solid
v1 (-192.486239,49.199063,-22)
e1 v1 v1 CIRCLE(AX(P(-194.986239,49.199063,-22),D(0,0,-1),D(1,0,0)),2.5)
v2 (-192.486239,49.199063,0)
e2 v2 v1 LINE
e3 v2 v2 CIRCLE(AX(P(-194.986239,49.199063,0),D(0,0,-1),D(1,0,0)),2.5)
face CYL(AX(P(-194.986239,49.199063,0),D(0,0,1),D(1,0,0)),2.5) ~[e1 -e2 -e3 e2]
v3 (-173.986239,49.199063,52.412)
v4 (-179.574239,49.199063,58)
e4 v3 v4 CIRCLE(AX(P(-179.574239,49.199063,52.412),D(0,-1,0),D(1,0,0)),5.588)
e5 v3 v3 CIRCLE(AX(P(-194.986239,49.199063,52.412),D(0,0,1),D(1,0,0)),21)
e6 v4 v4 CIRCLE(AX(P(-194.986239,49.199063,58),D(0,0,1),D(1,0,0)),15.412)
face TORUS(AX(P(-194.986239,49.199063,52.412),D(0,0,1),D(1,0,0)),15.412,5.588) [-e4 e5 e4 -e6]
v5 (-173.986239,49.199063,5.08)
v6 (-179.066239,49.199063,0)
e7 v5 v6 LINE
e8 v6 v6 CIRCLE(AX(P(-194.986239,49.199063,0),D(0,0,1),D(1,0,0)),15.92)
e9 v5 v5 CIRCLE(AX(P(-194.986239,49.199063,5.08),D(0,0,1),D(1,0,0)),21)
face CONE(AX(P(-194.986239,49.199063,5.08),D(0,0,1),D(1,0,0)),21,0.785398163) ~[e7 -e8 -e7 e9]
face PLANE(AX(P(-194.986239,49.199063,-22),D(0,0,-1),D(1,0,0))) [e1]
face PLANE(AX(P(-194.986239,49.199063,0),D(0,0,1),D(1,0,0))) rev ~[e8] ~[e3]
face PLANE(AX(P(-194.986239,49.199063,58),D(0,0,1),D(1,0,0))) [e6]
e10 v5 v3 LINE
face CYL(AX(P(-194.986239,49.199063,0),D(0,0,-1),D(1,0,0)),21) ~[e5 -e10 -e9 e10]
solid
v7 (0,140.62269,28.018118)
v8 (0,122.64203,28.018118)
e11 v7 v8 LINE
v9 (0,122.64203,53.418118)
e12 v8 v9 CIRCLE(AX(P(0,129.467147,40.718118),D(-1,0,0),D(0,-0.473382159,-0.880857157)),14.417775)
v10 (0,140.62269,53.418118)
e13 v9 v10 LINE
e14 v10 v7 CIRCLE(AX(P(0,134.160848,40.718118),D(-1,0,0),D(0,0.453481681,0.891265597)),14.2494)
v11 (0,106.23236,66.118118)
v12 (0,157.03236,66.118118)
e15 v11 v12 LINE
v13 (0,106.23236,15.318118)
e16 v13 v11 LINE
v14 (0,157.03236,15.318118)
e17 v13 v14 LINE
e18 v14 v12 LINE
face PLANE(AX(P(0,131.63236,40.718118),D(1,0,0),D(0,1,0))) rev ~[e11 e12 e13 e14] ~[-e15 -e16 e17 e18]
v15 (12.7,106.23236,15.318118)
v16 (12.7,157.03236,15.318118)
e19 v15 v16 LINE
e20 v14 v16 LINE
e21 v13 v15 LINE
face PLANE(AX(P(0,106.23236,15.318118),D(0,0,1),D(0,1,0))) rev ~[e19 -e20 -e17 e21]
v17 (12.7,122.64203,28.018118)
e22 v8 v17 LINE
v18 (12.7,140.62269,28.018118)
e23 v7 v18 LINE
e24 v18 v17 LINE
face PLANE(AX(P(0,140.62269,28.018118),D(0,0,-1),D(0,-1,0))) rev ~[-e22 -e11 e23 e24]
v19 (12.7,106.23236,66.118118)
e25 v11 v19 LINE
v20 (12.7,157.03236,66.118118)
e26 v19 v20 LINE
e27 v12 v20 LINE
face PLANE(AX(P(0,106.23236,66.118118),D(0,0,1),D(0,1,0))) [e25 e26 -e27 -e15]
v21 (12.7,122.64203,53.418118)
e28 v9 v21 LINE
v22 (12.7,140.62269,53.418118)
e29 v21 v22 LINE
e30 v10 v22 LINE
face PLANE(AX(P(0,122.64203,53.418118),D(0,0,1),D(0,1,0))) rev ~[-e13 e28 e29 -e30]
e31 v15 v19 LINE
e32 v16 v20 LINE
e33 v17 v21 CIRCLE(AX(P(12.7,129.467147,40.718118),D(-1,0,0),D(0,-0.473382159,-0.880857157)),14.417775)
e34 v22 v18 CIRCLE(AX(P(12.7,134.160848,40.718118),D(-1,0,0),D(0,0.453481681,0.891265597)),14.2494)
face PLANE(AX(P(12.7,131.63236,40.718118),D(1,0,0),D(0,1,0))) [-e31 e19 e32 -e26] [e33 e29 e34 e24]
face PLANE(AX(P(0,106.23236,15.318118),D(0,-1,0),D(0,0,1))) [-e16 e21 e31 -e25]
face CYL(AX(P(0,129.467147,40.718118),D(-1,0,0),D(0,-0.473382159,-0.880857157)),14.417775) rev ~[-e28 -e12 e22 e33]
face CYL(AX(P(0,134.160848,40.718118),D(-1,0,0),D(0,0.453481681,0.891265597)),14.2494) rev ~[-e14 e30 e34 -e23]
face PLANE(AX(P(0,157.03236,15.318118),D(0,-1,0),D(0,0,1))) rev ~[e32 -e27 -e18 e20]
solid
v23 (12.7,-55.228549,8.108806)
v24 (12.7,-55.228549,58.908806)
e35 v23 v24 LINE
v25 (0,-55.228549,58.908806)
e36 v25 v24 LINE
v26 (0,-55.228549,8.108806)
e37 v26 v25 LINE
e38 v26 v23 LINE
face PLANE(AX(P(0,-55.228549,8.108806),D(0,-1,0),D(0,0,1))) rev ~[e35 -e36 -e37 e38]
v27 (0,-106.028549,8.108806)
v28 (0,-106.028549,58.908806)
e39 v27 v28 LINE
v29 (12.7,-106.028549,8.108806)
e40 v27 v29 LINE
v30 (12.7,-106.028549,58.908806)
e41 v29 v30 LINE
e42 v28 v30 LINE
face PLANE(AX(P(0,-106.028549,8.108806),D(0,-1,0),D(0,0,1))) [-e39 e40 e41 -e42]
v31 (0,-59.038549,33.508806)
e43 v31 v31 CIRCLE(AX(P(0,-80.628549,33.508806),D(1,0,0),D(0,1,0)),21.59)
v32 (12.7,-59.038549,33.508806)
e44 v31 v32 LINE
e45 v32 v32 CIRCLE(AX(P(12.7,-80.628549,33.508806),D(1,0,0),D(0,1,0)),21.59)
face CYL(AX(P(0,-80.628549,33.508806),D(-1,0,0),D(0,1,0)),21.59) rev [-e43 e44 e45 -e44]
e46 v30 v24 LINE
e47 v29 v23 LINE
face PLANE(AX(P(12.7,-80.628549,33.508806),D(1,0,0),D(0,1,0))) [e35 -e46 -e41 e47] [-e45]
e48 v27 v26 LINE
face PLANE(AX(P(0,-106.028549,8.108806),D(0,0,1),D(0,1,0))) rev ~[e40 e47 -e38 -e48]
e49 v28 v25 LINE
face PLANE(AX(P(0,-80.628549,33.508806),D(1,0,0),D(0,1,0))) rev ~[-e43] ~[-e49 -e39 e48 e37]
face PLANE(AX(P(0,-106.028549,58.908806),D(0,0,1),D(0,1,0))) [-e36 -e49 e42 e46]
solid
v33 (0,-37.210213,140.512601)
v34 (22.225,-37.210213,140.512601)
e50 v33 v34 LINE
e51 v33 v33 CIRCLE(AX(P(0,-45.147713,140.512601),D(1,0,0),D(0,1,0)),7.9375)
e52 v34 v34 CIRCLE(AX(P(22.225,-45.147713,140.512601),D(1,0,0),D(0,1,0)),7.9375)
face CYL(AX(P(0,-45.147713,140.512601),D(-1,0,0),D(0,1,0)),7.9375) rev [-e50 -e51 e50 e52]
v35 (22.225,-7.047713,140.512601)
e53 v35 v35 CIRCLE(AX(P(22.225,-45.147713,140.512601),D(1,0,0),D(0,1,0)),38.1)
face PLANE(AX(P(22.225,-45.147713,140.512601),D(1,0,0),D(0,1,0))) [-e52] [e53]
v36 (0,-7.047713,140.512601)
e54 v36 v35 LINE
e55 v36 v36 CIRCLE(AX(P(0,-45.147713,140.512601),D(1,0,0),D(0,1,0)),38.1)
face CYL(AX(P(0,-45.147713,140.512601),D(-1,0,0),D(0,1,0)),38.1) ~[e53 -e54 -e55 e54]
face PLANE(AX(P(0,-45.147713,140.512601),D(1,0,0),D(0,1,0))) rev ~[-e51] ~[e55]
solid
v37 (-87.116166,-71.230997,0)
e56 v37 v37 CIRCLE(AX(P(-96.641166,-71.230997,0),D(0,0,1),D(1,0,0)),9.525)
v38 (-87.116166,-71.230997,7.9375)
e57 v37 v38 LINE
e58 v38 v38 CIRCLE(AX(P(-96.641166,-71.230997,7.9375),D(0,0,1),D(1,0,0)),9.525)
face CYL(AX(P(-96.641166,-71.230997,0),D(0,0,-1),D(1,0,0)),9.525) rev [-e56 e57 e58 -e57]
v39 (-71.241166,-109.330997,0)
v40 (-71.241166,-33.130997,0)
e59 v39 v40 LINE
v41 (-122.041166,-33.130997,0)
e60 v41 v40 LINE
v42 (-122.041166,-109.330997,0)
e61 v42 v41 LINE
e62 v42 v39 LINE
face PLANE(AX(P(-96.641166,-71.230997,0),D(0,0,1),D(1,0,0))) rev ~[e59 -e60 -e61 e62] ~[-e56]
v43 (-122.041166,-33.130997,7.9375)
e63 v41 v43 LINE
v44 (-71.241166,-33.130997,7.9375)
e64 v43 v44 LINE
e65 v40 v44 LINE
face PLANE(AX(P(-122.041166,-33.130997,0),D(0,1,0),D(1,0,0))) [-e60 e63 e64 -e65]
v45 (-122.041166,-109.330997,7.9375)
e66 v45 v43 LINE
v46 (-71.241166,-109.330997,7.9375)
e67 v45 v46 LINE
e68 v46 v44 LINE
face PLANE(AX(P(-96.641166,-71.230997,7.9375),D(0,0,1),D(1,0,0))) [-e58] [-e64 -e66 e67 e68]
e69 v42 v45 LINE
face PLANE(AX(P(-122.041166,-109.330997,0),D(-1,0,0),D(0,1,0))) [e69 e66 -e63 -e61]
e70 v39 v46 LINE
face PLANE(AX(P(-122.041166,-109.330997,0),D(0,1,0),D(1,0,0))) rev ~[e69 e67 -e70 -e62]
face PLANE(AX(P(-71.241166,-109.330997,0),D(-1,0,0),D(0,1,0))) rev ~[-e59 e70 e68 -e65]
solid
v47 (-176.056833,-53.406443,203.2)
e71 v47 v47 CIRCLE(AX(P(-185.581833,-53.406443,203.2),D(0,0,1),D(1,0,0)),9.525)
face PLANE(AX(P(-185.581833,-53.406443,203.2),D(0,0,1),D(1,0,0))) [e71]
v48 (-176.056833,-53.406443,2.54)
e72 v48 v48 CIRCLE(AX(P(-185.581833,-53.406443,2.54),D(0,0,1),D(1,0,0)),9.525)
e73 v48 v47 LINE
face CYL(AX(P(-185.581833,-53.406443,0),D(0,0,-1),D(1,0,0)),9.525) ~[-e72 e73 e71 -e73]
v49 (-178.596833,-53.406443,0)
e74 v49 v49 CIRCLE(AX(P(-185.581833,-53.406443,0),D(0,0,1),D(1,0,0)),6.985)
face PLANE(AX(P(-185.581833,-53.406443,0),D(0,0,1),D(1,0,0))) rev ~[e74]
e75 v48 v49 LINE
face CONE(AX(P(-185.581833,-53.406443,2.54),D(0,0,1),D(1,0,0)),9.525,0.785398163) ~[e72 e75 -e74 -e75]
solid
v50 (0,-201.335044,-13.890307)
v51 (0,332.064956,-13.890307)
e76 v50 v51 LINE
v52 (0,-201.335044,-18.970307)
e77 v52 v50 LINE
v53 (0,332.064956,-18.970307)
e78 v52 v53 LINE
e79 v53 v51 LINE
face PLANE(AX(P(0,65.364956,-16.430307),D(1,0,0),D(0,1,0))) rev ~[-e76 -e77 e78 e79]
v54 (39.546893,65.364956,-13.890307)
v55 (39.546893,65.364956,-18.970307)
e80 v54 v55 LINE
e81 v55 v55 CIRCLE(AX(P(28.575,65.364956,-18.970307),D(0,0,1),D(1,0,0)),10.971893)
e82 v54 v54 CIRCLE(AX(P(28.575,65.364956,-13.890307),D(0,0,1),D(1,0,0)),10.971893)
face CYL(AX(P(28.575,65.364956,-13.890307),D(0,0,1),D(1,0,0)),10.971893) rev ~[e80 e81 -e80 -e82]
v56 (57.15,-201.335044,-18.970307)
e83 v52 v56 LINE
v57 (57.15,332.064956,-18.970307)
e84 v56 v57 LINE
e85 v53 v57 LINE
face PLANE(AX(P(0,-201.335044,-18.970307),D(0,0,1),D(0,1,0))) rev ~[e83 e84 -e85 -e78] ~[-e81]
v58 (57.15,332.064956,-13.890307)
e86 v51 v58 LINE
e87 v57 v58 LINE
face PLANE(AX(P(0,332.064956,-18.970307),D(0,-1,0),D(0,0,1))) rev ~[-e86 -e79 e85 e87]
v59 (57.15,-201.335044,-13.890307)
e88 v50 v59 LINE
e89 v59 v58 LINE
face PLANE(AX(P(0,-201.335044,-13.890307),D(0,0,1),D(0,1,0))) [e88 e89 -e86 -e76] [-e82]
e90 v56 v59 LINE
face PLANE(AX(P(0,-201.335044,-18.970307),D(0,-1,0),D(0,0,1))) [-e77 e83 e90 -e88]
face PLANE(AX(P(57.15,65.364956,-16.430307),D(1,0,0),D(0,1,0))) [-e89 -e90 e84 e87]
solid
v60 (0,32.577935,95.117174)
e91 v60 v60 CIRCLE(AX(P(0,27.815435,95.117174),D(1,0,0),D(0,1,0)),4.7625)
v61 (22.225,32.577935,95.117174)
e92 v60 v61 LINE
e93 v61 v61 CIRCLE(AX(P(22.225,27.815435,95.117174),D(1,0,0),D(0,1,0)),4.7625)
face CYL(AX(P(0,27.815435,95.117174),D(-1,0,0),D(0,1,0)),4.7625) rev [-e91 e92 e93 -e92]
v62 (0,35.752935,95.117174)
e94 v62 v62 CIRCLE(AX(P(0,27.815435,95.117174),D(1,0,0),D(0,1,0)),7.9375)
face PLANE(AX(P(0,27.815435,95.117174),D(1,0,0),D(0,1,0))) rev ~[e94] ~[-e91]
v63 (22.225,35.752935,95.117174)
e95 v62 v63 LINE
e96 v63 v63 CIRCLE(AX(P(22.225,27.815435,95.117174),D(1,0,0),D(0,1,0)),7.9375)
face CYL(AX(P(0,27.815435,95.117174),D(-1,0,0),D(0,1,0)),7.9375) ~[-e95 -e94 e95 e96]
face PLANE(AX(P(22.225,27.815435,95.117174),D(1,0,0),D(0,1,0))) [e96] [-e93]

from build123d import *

# Parameters (mm, degrees)
F0_W      = 533.4
F0_H      = 5.08
F1_DEPTH  = 57.15
F2_R      = 25
F3_DEPTH  = 55
F4_SIZE   = 5.08
F5_R      = 3
F6_DEPTH  = 19.05
F7_R      = 7.9375
F7_R_2    = 4.7625
F8_DEPTH  = 22.225
F9_R      = 38.1
F9_R_2    = 7.9375
F10_DEPTH = 22.225
F11_R     = 10.9718927616
F12_DEPTH = 25.4
F14_R     = 21
F15_DEPTH = 58
F16_SIZE  = 5.08
F17_R     = 5.588
F18_R     = 2.5
F19_DEPTH = 22
F20_W     = 50.8
F20_H     = 50.8
F20_R     = 21.59
F21_DEPTH = 12.7
F22_W     = 50.8
F22_H     = 50.8
F23_DEPTH = 12.7
F24_W     = 50.8
F24_H     = 76.2
F24_R     = 9.525
F25_DEPTH = 7.9375
F26_R     = 9.525
F27_DEPTH = 203.2
F28_SIZE  = 2.54


# Not quite as in the source:
# - a length typed as a fraction of an inch, garbled in the dataset ("3 / 203.2 mm" for 3/8 in), is restored


with BuildPart() as f1:
    # F0 (on Right) → F1 (new body)
    with BuildSketch(Plane.YZ):
        with Locations((65.3649564266, -16.4303069627)):
            Rectangle(F0_W, F0_H)
    extrude(amount=F1_DEPTH)

    # F11 (on face) → F12 (cut)
    with BuildSketch(Plane.XY.offset(-13.8903069627)):
        with Locations((28.575, 65.3649564266)):
            Circle(F11_R)
    extrude(amount=-F12_DEPTH, mode=Mode.SUBTRACT)


with BuildPart() as f3:
    # F2 (on Top) → F3 (new body)
    with BuildSketch(Plane.XY):
        with Locations((-105.339050293, -53.4889884293)):
            Circle(F2_R)
    extrude(amount=F3_DEPTH)

    # F4
    f4_edges = [f3.edges().sort_by_distance(p)[0] for p in [
        (-130.33905, -53.488988, 55),
    ]]
    chamfer(f4_edges, length=F4_SIZE)

    # F5 (on face) → F6 (join)
    with BuildSketch(Plane(origin=(0, 0, 0), x_dir=(1, 0, 0), z_dir=(0, 0, -1))):
        with Locations((-105.339050293, 53.4889884293)):
            Circle(F5_R)
    extrude(amount=F6_DEPTH)


with BuildPart() as f8:
    # F7 (on Right) → F8 (new body)
    with BuildSketch(Plane.YZ):
        with Locations((27.8154350817, 95.117174089)):
            Circle(F7_R)
        with Locations((27.8154350817, 95.117174089)):
            Circle(F7_R_2, mode=Mode.SUBTRACT)
    extrude(amount=F8_DEPTH)


with BuildPart() as f10:
    # F9 (on Right) → F10 (new body)
    with BuildSketch(Plane.YZ):
        with Locations((-45.1477132738, 140.5126005411)):
            Circle(F9_R)
        with Locations((-45.1477132738, 140.5126005411)):
            Circle(F9_R_2, mode=Mode.SUBTRACT)
    extrude(amount=F10_DEPTH)


with BuildPart() as f15:
    # F14 (on Top) → F15 (new body)
    with BuildSketch(Plane.XY):
        with Locations((-194.9862390757, 49.1990633309)):
            Circle(F14_R)
    extrude(amount=F15_DEPTH)

    # F16
    f16_edges = [f15.edges().sort_by_distance(p)[0] for p in [
        (-215.986239, 49.199063, 0),
    ]]
    chamfer(f16_edges, length=F16_SIZE)

    # F17
    f17_edges = [f15.edges().sort_by_distance(p)[0] for p in [
        (-215.986239, 49.199063, 58),
    ]]
    fillet(f17_edges, radius=F17_R)

    # F18 (on face) → F19 (join)
    with BuildSketch(Plane(origin=(0, 0, 0), x_dir=(1, 0, 0), z_dir=(0, 0, -1))):
        with Locations((-194.9862390757, -49.1990633309)):
            Circle(F18_R)
    extrude(amount=F19_DEPTH)


with BuildPart() as f21:
    # F20 (on Right) → F21 (new body)
    with BuildSketch(Plane.YZ):
        with Locations((-80.6285493731, 33.508805865)):
            Rectangle(F20_W, F20_H)
        with Locations((-80.6285493731, 33.508805865)):
            Circle(F20_R, mode=Mode.SUBTRACT)
    extrude(amount=F21_DEPTH)


with BuildPart() as f23:
    # F22 (on Right) → F23 (new body)
    with BuildSketch(Plane.YZ):
        with Locations((131.6323596907, 40.7181175649)):
            Rectangle(F22_W, F22_H)
        with BuildLine():
            Line((122.6420296907, 53.4181175649), (140.6226896907, 53.4181175649))
            ThreePointArc((140.6226896907, 53.4181175649), (148.4102478202, 40.7181175649), (140.6226896907, 28.0181175649))
            Line((140.6226896907, 28.0181175649), (122.6420296907, 28.0181175649))
            ThreePointArc((122.6420296907, 28.0181175649), (115.0493723243, 40.7181175649), (122.6420296907, 53.4181175649))
        make_face(mode=Mode.SUBTRACT)
    extrude(amount=F23_DEPTH)


with BuildPart() as f25:
    # F24 (on Top) → F25 (new body)
    with BuildSketch(Plane.XY):
        with Locations((-96.6411658287, -71.230996871)):
            Rectangle(F24_W, F24_H)
        with Locations((-96.6411658287, -71.230996871)):
            Circle(F24_R, mode=Mode.SUBTRACT)
    extrude(amount=F25_DEPTH)


with BuildPart() as f27:
    # F26 (on Top) → F27 (new body)
    with BuildSketch(Plane.XY):
        with Locations((-185.5818331242, -53.4064434469)):
            Circle(F26_R)
    extrude(amount=F27_DEPTH)

    # F28
    f28_edges = [f27.edges().sort_by_distance(p)[0] for p in [
        (-195.106833, -53.406443, 0),
    ]]
    chamfer(f28_edges, length=F28_SIZE)


solid = Compound([f1.part, f8.part, f10.part, f15.part, f21.part, f23.part, f25.part, f27.part])
